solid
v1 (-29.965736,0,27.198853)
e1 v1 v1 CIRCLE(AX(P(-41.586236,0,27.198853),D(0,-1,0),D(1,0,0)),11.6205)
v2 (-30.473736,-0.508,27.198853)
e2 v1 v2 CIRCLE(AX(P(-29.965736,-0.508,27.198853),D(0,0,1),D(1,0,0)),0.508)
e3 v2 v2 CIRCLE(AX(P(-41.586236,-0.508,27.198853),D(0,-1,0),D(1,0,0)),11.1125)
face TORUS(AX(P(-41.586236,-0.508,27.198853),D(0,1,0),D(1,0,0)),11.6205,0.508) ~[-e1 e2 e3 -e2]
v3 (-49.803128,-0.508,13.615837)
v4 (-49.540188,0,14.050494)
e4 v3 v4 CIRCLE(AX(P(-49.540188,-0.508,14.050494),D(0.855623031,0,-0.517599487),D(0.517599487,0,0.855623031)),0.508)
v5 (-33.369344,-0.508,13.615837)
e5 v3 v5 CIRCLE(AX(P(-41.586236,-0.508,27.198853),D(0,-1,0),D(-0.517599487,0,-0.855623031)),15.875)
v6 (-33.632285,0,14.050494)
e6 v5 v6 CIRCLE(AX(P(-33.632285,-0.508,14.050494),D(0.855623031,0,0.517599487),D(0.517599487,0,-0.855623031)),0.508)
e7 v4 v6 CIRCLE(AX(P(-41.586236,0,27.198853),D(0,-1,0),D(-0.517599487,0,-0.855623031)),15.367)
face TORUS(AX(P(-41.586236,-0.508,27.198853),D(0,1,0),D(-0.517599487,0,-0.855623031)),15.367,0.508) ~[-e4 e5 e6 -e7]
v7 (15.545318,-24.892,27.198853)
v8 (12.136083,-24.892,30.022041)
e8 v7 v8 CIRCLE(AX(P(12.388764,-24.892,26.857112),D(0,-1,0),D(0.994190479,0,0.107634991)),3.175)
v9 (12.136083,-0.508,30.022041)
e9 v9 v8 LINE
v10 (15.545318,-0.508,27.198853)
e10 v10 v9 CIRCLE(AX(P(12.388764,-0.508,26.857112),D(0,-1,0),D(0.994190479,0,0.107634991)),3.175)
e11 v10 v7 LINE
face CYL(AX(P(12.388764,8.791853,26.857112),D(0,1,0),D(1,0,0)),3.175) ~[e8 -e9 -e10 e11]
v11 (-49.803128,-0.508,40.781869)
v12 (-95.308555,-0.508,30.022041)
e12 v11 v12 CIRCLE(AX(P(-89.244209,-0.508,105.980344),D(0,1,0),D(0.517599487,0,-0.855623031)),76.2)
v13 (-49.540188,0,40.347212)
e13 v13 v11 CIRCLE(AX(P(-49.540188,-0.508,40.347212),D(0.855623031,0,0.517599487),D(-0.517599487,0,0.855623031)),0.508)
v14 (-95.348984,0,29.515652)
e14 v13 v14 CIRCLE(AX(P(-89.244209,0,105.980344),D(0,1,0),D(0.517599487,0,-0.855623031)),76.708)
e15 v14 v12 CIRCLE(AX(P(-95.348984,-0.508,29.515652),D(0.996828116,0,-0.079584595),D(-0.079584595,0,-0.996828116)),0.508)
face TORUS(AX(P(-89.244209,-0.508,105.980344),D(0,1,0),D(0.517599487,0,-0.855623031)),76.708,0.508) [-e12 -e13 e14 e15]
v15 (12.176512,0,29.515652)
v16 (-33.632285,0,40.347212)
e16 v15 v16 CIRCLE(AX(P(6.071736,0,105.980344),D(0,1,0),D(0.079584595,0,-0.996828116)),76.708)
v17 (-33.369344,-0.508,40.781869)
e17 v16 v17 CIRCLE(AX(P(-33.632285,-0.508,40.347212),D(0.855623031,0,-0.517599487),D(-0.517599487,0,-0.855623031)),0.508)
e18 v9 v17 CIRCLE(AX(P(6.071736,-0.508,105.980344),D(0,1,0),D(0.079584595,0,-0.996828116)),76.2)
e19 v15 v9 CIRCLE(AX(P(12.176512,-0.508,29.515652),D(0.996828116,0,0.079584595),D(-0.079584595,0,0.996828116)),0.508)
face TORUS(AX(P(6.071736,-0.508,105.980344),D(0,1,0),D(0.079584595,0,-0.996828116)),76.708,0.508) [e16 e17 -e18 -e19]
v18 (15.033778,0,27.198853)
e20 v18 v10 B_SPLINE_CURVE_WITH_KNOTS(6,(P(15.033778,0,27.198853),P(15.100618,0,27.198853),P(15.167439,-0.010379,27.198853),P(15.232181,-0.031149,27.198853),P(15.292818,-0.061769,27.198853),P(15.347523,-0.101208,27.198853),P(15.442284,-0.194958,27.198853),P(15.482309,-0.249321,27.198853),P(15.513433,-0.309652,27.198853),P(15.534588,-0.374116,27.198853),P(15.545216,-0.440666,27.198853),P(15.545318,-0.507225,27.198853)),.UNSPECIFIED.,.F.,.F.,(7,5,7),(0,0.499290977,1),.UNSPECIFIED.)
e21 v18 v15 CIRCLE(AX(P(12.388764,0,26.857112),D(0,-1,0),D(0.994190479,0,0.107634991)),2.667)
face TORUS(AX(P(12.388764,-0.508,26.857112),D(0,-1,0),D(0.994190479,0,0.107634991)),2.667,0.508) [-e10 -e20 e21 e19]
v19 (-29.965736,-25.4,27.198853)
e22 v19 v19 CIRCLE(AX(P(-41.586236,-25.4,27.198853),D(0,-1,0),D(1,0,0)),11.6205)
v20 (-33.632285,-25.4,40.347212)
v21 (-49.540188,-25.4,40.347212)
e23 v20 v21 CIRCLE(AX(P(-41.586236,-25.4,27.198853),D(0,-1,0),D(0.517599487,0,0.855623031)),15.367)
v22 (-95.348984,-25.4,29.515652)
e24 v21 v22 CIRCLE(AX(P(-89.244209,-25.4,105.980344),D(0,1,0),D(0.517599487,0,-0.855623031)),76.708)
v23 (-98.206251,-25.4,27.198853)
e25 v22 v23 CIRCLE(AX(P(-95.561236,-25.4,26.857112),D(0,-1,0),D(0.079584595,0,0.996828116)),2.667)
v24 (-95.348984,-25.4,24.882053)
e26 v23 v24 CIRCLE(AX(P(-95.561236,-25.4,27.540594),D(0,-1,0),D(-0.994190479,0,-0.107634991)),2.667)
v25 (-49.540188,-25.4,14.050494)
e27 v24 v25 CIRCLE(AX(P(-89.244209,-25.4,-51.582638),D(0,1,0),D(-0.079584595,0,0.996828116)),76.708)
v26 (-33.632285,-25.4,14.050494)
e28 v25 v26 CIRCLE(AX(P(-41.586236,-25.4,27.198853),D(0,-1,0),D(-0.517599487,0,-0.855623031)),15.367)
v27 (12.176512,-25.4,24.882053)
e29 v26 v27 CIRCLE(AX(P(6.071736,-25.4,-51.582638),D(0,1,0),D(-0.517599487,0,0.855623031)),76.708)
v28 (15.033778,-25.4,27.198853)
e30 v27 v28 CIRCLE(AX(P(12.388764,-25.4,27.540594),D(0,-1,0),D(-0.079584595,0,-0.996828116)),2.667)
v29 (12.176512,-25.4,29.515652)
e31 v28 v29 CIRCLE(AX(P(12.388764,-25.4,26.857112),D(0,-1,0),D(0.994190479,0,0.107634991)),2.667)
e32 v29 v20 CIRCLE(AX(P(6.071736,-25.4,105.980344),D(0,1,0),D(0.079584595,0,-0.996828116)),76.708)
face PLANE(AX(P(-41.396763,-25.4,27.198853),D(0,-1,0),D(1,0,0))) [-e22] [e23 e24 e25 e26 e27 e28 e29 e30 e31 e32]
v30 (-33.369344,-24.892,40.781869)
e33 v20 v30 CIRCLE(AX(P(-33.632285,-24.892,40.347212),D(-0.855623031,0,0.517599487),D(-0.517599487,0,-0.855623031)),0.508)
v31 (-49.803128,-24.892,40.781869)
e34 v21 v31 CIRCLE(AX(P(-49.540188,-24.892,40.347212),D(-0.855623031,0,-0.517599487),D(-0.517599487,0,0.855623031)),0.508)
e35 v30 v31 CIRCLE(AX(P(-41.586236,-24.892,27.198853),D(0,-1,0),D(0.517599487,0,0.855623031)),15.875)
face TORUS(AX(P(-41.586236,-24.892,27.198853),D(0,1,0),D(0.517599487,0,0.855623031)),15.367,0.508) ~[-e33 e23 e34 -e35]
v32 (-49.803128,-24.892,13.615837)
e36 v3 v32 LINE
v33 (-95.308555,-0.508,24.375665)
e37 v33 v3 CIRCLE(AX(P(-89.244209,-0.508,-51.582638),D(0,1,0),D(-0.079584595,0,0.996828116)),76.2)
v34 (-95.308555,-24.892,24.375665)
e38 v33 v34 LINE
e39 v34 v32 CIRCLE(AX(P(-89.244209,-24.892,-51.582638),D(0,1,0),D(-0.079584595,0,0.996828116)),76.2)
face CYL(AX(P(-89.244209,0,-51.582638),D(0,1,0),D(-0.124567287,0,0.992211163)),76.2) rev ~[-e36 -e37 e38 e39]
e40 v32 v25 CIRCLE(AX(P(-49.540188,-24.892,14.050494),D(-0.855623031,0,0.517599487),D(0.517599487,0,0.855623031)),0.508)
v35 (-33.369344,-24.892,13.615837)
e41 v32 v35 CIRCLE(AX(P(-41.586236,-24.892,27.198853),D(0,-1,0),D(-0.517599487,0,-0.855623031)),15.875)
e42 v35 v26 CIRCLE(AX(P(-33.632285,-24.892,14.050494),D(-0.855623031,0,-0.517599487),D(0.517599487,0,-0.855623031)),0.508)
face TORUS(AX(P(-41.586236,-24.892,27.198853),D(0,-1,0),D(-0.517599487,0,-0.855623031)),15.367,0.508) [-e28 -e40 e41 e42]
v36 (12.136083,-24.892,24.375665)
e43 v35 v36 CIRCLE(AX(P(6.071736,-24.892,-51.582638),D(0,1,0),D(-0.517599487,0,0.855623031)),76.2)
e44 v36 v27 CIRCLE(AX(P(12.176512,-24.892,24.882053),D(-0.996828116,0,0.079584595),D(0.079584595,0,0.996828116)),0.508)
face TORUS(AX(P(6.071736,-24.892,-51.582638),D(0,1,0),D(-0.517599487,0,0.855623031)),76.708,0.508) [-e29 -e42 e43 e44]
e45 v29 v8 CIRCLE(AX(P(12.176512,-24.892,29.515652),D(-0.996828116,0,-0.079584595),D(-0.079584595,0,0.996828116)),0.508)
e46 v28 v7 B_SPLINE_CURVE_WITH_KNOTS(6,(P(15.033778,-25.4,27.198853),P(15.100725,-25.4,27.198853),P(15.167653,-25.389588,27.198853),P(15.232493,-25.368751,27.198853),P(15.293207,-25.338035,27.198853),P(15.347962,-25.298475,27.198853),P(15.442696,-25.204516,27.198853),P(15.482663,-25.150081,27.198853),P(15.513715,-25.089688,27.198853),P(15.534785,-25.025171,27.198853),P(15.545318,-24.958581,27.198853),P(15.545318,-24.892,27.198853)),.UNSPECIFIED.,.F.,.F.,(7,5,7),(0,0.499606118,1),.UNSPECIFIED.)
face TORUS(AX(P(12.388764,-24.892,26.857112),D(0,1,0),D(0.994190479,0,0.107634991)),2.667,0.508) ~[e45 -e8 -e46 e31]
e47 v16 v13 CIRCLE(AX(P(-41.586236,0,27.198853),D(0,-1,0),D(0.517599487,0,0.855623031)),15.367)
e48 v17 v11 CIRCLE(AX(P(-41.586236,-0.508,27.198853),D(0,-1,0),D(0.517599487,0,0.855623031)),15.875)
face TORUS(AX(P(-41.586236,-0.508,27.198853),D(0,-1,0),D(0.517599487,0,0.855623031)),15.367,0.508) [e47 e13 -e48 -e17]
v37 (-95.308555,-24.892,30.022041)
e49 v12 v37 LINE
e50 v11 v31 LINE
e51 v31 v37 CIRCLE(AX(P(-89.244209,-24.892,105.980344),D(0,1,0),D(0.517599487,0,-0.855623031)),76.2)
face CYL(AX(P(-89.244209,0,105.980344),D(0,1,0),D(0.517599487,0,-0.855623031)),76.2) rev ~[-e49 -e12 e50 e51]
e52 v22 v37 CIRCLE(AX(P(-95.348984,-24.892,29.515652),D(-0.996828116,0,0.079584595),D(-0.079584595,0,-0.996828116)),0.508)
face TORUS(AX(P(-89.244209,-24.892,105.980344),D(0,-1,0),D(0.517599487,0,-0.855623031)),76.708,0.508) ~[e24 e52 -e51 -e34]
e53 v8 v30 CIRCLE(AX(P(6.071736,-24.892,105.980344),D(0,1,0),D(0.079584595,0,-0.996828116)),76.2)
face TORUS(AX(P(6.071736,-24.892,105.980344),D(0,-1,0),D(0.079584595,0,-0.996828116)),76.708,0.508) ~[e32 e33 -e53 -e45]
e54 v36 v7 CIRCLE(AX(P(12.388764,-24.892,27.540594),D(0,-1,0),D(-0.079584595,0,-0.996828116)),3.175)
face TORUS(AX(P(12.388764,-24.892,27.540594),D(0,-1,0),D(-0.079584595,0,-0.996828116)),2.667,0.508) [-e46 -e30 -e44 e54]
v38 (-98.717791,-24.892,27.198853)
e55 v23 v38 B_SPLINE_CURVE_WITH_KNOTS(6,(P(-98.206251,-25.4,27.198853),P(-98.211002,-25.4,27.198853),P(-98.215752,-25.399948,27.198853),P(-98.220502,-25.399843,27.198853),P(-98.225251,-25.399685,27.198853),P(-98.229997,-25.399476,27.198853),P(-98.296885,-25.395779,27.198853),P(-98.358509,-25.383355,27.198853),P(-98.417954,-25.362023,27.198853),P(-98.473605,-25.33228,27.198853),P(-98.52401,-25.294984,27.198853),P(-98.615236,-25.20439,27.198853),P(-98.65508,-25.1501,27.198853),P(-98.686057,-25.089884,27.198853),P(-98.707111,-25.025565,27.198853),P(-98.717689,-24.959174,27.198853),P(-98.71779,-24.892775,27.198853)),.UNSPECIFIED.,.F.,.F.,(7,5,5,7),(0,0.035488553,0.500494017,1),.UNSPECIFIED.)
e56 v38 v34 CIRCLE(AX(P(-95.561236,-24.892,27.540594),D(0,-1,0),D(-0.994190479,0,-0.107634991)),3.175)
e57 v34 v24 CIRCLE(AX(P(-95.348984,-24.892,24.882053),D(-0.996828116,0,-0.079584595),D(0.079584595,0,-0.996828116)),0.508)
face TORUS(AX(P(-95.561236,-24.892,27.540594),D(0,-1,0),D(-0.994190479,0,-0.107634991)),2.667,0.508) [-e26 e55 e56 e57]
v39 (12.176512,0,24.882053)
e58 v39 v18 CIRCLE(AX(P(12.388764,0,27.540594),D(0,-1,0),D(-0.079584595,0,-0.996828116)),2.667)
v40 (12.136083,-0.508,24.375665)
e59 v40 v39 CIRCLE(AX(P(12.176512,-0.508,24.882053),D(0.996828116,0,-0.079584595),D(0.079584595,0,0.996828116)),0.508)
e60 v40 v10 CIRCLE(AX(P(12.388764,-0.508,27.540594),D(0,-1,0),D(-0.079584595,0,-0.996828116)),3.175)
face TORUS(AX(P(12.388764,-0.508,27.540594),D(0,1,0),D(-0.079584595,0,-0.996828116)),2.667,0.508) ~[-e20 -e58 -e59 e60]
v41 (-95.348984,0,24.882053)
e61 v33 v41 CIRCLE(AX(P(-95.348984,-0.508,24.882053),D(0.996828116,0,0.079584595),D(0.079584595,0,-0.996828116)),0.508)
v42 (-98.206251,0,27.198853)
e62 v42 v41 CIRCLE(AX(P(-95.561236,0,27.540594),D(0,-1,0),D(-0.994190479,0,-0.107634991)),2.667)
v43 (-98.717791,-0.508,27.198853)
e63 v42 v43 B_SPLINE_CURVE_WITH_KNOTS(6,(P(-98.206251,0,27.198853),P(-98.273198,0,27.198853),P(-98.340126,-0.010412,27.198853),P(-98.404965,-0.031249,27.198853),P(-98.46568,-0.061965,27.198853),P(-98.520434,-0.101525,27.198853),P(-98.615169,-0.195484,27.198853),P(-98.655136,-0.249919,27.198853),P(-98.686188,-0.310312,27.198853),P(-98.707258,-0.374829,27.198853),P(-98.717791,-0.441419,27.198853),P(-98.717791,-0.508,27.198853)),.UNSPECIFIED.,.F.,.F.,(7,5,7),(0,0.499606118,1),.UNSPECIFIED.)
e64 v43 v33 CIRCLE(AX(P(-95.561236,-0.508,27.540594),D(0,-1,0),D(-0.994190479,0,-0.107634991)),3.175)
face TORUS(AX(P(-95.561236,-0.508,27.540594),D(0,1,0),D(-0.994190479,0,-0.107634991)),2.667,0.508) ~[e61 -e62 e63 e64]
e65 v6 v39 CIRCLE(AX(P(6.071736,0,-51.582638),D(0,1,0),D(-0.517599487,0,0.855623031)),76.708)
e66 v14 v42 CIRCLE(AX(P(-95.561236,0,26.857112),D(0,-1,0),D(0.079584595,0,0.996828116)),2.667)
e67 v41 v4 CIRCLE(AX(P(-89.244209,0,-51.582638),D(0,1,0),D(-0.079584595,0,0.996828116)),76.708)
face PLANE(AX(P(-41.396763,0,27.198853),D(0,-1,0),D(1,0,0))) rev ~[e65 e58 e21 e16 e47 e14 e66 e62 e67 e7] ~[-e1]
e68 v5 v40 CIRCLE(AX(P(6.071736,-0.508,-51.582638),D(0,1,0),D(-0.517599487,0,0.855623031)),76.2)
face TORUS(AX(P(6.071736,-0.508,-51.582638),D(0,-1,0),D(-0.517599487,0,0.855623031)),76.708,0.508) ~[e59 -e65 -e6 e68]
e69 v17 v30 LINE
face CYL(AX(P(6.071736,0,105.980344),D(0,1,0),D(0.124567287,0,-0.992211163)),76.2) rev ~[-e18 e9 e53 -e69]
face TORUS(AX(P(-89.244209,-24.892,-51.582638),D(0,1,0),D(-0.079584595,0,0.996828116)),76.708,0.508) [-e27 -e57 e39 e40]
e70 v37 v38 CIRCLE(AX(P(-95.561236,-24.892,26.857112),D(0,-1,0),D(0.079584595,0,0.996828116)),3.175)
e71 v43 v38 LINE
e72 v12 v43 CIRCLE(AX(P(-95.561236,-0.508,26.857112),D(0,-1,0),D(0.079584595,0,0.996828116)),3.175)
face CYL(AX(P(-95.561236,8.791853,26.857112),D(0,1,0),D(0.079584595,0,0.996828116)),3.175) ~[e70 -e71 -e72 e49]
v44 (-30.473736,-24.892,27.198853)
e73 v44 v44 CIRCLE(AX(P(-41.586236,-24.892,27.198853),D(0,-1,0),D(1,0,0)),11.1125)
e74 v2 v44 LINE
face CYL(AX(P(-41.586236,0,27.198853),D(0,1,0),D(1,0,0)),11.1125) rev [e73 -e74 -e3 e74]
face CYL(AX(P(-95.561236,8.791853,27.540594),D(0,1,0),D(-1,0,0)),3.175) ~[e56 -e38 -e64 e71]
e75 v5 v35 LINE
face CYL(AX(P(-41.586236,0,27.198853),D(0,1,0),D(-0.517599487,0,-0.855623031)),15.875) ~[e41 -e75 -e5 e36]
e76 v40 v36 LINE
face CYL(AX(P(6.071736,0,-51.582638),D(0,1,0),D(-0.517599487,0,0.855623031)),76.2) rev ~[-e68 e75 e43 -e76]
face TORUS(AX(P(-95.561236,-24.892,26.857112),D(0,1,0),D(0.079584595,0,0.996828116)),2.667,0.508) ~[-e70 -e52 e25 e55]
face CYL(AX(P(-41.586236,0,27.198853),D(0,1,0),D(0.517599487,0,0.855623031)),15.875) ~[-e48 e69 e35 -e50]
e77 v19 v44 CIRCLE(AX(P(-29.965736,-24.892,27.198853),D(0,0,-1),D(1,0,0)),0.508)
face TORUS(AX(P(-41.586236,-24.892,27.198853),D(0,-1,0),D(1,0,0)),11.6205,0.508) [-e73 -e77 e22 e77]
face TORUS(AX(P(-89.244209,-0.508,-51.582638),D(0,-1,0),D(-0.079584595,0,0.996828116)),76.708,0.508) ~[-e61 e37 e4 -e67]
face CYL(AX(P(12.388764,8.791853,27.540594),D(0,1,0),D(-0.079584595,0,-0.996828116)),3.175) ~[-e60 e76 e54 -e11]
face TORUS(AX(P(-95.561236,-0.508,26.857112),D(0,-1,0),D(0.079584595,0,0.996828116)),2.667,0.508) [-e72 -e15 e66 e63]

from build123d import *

# Parameters (mm, degrees)
F0_R        = 11.1125
F1_DEPTH    = 25.4
F2_T1_DEPTH = 42.98370548
F3_R        = 0.508


# Not quite as in the source:
# - a fillet or chamfer that OpenCascade refuses, or shapes differently, is made with other operations: its cross-section is extruded or revolved along the edge and cut away or added


with BuildPart() as f1:
    # F0 (on Front) → F1 (new body)
    with BuildSketch(Plane.XZ):
        with BuildLine():
            ThreePointArc((-33.3693444663, 13.6158373531), (-27.7576647521, 19.4023003087), (-25.711236319, 27.1988529712))
            ThreePointArc((-25.711236319, 27.1988529712), (-27.7576647521, 34.9954056337), (-33.3693444663, 40.7818685893))
            ThreePointArc((-33.3693444663, 40.7818685893), (-41.586236319, 43.0738529712), (-49.8031281716, 40.7818685893))
            ThreePointArc((-49.8031281716, 40.7818685893), (-57.461236319, 27.1988529712), (-49.8031281716, 13.6158373531))
            ThreePointArc((-49.8031281716, 13.6158373531), (-41.586236319, 11.3238529712), (-33.3693444663, 13.6158373531))
        make_face()
        with Locations((-41.586236319, 27.1988529712)):
            Circle(F0_R, mode=Mode.SUBTRACT)
        with BuildLine():
            ThreePointArc((-33.3693444663, 40.7818685893), (-27.7576647521, 34.9954056337), (-25.711236319, 27.1988529712))
            ThreePointArc((-25.711236319, 27.1988529712), (-27.7576647521, 19.4023003087), (-33.3693444663, 13.6158373531))
            ThreePointArc((-33.3693444663, 13.6158373531), (-9.7812806597, 22.9500521891), (15.563763681, 24.0238529712))
            Line((15.563763681, 24.0238529712), (15.563763681, 27.1988529712))
            Line((15.563763681, 27.1988529712), (15.563763681, 30.3738529712))
            ThreePointArc((15.563763681, 30.3738529712), (-9.7812806597, 31.4476537533), (-33.3693444663, 40.7818685893))
        make_face()
        with BuildLine():
            ThreePointArc((-49.8031281716, 13.6158373531), (-57.461236319, 27.1988529712), (-49.8031281716, 40.7818685893))
            ThreePointArc((-49.8031281716, 40.7818685893), (-73.3911919783, 31.4476537533), (-98.736236319, 30.3738529712))
            Line((-98.736236319, 30.3738529712), (-98.736236319, 27.1988529712))
            Line((-98.736236319, 27.1988529712), (-98.736236319, 24.0238529712))
            ThreePointArc((-98.736236319, 24.0238529712), (-73.3911919783, 22.9500521891), (-49.8031281716, 13.6158373531))
        make_face()
    extrude(amount=F1_DEPTH)

    # F2: fillet of radius 3.175 on 4 edges, made by hand

    # F2_s2 → F2_t1 (cut)
    with BuildSketch(Plane.XZ.offset(-8.79185274)):
        with BuildLine():
            ThreePointArc((15.563763681, 26.8571118752), (14.5426395524, 29.1898021098), (12.1360825908, 30.0220411424))
            ThreePointArc((12.1360825908, 30.0220411424), (13.8519119629, 30.1785700373), (15.563763681, 30.3738529712))
            Line((15.563763681, 30.3738529712), (15.563763681, 26.8571118752))
        make_face()
        with BuildLine():
            ThreePointArc((12.1360825908, 24.3756648), (14.5426395524, 25.2079038326), (15.563763681, 27.5405940672))
            Line((15.563763681, 27.5405940672), (15.563763681, 24.0238529712))
            ThreePointArc((15.563763681, 24.0238529712), (13.8519119629, 24.219135905), (12.1360825908, 24.3756648))
        make_face()
        with BuildLine():
            ThreePointArc((-95.3085552288, 30.0220411424), (-97.7151121904, 29.1898021098), (-98.736236319, 26.8571118752))
            Line((-98.736236319, 26.8571118752), (-98.736236319, 30.3738529712))
            ThreePointArc((-98.736236319, 30.3738529712), (-97.0243846009, 30.1785700373), (-95.3085552288, 30.0220411424))
        make_face()
        with BuildLine():
            ThreePointArc((-98.736236319, 27.5405940672), (-97.7151121904, 25.2079038326), (-95.3085552288, 24.3756648))
            ThreePointArc((-95.3085552288, 24.3756648), (-97.0243846009, 24.219135905), (-98.736236319, 24.0238529712))
            Line((-98.736236319, 24.0238529712), (-98.736236319, 27.5405940672))
        make_face()
    extrude(amount=F2_T1_DEPTH, mode=Mode.SUBTRACT)

    # F3
    f3_edges = [f1.edges().sort_by_distance(p)[0] for p in [
        (-71.710097, -25.4, 31.825135),
        (-11.462375, 0, 31.825135),
        (-11.462375, -25.4, 22.572571),
        (-11.462375, 0, 22.572571),
        (-52.698736, -25.4, 27.198853),
        (-52.698736, 0, 27.198853),
    ]]
    fillet(f3_edges, radius=F3_R)


solid = f1.part
